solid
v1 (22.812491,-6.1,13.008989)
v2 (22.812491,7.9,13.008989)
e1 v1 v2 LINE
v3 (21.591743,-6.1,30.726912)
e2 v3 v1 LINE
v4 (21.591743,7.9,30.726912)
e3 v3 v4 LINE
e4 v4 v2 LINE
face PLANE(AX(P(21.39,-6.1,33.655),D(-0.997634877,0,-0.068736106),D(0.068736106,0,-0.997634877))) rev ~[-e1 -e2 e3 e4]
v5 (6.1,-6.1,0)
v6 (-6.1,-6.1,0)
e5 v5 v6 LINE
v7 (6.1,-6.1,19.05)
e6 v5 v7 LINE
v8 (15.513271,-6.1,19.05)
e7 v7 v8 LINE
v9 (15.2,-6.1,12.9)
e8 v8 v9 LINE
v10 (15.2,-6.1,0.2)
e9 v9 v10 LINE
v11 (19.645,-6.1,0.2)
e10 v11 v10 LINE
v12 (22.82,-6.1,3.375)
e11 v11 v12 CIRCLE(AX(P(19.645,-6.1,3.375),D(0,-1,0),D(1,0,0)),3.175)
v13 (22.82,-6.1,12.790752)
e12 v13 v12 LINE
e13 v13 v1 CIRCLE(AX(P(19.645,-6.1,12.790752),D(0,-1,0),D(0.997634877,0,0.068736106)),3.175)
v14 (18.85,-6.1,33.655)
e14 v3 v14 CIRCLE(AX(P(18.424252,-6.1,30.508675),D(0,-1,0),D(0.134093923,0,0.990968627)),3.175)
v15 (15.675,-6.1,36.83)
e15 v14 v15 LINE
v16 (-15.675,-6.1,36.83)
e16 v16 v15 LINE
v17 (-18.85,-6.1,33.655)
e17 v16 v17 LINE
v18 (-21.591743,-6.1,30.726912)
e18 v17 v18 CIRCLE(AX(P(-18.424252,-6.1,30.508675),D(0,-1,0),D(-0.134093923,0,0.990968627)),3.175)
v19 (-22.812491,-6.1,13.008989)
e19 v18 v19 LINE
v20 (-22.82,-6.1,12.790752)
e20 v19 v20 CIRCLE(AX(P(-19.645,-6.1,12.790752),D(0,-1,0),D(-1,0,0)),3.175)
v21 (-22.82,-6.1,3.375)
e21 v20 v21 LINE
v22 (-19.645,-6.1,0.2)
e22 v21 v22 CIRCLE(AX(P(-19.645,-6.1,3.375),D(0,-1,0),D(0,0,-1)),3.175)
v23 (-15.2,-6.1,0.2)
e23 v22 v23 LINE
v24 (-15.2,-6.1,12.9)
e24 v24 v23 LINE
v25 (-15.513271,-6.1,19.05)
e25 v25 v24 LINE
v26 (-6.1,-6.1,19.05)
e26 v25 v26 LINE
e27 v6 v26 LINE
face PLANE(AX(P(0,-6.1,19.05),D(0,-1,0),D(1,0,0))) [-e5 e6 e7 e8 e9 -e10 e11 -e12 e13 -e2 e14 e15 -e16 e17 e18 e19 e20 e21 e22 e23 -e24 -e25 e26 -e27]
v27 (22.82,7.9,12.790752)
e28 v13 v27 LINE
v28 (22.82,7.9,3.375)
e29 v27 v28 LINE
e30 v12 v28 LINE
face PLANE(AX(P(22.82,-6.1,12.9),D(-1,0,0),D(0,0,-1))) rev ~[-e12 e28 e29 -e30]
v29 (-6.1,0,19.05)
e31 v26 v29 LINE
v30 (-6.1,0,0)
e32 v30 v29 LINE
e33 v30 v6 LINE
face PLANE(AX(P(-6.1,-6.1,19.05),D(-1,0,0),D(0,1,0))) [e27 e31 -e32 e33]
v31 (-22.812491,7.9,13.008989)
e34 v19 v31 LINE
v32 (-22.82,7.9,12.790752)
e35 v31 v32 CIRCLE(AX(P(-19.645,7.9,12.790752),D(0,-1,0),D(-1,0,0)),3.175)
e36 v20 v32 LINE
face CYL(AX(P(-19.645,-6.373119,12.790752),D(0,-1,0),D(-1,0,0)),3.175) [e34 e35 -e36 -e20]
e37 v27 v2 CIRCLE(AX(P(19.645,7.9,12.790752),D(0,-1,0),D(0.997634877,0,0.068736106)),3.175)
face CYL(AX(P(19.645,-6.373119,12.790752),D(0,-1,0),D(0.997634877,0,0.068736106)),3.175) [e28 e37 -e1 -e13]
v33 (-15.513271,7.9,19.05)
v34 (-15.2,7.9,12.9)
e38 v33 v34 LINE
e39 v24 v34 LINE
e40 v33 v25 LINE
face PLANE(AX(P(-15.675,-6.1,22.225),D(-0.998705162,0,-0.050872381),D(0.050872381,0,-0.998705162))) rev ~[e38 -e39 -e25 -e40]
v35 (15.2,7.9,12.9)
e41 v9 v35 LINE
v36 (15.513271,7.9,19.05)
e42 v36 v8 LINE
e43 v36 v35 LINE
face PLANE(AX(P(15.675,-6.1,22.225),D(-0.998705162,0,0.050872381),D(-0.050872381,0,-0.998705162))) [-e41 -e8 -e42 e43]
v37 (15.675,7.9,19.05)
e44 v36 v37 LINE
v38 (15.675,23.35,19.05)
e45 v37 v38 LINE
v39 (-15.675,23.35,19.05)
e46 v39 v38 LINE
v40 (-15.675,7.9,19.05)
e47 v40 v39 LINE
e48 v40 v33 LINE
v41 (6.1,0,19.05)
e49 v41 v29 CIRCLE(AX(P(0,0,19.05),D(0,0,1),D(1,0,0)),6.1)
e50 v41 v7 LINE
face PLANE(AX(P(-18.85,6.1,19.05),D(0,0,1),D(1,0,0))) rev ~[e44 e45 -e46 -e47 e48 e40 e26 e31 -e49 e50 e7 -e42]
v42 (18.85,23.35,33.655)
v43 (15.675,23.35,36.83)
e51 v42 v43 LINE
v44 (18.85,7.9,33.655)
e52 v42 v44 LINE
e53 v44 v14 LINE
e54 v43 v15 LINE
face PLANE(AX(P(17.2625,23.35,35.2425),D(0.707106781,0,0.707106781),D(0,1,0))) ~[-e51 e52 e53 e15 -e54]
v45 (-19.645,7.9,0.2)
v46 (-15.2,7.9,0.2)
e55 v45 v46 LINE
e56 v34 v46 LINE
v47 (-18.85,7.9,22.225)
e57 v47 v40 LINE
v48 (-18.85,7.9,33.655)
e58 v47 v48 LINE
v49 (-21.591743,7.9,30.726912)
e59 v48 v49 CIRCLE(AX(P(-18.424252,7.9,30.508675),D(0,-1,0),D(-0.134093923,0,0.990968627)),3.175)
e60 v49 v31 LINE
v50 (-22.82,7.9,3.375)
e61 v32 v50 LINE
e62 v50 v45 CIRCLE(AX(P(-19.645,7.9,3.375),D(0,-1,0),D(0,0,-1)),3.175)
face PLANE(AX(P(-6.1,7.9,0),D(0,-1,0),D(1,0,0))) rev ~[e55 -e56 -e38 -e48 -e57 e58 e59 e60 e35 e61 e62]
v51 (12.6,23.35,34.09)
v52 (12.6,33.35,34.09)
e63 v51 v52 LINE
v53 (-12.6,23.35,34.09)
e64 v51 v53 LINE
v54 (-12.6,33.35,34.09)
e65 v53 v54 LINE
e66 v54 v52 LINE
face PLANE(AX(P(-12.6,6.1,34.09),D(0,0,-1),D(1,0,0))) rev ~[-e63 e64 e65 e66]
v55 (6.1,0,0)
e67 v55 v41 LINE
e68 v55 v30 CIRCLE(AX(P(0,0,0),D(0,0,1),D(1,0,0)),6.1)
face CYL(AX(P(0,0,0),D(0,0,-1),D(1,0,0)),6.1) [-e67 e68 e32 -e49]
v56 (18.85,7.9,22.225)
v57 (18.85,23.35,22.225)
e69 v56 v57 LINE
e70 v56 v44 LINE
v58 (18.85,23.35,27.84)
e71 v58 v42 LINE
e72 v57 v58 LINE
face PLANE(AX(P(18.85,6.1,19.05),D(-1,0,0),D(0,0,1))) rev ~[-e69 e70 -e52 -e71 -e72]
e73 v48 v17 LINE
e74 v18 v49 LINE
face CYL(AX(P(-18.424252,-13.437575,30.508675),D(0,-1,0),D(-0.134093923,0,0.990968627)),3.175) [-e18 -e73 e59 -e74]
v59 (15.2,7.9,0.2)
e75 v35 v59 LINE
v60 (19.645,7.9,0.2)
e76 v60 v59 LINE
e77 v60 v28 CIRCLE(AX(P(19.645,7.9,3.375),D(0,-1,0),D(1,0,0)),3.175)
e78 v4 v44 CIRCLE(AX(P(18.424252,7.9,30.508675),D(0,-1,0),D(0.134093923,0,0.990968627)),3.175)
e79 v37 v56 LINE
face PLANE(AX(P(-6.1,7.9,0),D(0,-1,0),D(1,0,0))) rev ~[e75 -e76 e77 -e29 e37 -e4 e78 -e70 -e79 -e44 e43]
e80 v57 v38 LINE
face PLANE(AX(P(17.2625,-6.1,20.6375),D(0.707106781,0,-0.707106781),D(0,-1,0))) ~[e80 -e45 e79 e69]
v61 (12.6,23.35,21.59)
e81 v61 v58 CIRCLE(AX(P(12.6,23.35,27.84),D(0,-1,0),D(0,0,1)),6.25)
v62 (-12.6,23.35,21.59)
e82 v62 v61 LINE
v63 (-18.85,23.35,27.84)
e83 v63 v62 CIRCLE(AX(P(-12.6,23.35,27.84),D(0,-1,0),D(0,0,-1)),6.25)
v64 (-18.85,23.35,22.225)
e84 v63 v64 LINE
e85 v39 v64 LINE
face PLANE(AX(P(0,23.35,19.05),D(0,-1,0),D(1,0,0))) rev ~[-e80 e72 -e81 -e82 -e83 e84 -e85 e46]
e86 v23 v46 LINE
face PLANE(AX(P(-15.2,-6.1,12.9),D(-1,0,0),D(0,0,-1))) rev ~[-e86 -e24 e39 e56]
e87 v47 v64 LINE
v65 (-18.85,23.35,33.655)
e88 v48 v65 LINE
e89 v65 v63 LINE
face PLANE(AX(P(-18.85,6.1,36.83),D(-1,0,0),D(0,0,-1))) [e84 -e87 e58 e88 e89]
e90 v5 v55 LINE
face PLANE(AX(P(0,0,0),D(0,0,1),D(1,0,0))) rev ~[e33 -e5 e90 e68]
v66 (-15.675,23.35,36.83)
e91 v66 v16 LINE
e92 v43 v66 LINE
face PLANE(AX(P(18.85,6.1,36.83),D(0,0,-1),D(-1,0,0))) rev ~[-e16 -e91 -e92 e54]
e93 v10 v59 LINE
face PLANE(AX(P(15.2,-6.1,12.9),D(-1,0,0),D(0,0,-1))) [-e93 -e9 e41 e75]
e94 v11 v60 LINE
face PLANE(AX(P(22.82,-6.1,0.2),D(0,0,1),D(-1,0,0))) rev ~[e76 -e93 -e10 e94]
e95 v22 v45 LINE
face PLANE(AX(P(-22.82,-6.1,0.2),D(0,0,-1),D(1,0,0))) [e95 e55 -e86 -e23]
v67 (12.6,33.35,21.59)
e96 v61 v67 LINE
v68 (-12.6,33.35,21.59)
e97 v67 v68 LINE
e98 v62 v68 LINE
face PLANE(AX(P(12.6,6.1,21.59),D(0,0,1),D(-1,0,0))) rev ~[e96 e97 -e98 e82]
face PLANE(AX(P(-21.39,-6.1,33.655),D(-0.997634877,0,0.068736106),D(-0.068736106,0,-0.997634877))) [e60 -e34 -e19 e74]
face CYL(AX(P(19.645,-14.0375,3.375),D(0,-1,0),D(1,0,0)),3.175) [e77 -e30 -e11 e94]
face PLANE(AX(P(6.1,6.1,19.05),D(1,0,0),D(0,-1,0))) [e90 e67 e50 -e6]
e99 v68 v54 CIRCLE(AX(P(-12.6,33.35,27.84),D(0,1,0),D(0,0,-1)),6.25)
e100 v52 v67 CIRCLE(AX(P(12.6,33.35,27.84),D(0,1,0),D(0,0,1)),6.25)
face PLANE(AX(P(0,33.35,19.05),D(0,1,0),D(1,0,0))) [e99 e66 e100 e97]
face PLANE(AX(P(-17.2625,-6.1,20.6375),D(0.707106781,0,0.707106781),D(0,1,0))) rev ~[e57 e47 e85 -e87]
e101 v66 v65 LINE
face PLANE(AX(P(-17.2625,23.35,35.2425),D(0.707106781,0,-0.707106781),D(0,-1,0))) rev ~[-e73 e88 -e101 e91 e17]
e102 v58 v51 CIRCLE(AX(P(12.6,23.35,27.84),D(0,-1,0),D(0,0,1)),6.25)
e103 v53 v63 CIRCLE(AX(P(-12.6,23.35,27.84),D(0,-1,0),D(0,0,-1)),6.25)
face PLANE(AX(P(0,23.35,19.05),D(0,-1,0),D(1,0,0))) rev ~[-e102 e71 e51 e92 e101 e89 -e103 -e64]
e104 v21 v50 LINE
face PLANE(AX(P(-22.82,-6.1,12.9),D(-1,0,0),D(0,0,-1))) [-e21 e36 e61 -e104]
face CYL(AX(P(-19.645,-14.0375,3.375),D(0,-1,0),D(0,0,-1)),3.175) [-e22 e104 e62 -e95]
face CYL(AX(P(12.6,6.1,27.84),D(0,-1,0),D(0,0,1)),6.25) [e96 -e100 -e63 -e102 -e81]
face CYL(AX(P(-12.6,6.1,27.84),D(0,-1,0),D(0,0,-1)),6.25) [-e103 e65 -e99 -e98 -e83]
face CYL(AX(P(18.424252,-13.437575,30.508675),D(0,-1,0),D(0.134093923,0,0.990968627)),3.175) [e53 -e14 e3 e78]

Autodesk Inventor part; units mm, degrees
ref_plane "YZ Plane" through (0, 0, 0) normal (1, 0, 0) x (0, 1, 0)
ref_plane "XZ Plane" through (0, 0, 0) normal (0, 1, 0) x (-1, 0, 0)
ref_plane "XY Plane" through (0, 0, 0) normal (0, 0, 1) x (1, 0, 0)
sketch "Sketch1" plane through (0, 0, 0) normal (0, 0, 1) x (1, 0, 0)
  circle A0 centre (0, 0) radius 6.1
  line L0 (-6.1, 0) -> (-6.1, -6.1)
  line L1 (-6.1, -6.1) -> (6.1, -6.1)
  line L2 (6.1, -6.1) -> (6.1, 0)
  dimension "d0" = 12.2
extrude "Extrusion1" add sketch "Sketch1" along normal blind 19.05
sketch "Sketch2" plane through (0, 0, 19.05) normal (0, 0, 1) x (1, 0, 0)
  arc A0 (6.1, 0) -> (-6.1, 0) centre (0, 0) ccw construction
  line L0 (-6.1, 0) -> (-6.1, -6.1) construction
  line L1 (6.1, -6.1) -> (6.1, 0) construction
  line L2 (-6.1, -6.1) -> (-6.1, 6.1)
  line L3 (-6.1, 6.1) -> (6.1, 6.1)
  line L4 (6.1, 6.1) -> (6.1, -6.1)
  line L5 (-6.1, -6.1) -> (6.1, -6.1)
extrude "Extrusion2" add sketch "Sketch2" along normal blind 17.78
sketch "Sketch3" plane through (0, 6.1, 19.05) normal (0, 1, 0) x (1, 0, 0)
  line L0 (0, 0) -> (-6.1, 0) construction
  line L1 (-12.6, -8.79) -> (12.6, -8.79) construction
  line L2 (-12.6, -15.04) -> (12.6, -15.04)
  line L3 (12.6, -2.54) -> (-12.6, -2.54)
  arc A0 (-12.6, -2.54) -> (-12.6, -15.04) centre (-12.6, -8.79) ccw
  arc A1 (12.6, -15.04) -> (12.6, -2.54) centre (12.6, -8.79) ccw
  point P0 (0, 19.05)
  point P1 (0, -8.79)
  point P2 (0, -2.54)
  dimension "d5" = 2.54
  dimension "d6" = 25.2
  dimension "d7" = 12.5
extrude "Extrusion3" add sketch "Sketch3" along normal blind 27.25
sketch "Sketch4" plane through (0, 6.1, 19.05) normal (0, -1, 0) x (1, 0, 0)
  arc A0 (12.6, 2.54) -> (12.6, 15.04) centre (12.6, 8.79) ccw construction
  line L0 (-18.85, 0) -> (18.85, 0)
  line L1 (18.85, 0) -> (18.85, 17.78)
  line L2 (18.85, 17.78) -> (-18.85, 17.78)
  line L3 (-18.85, 17.78) -> (-18.85, 0)
  arc A1 (-12.6, 15.04) -> (-12.6, 2.54) centre (-12.6, 8.79) ccw construction
  line L4 (-6.1, 17.78) -> (6.1, 17.78) construction
  point P0 (0, -19.05)
  point P1 (-18.85, 8.79)
  point P2 (18.85, 8.79)
  point P3 (0, 17.78)
  point P4 (0, 0)
extrude "Extrusion4" add sketch "Sketch4" against normal blind 17.25
sketch "Sketch5" plane through (0, 6.1, 19.05) normal (0, -1, 0) x (1, 0, 0)
  line L0 (-18.85, 0) -> (-6.1, 0) construction
  line L1 (18.85, 17.78) -> (-18.85, 17.78)
  line L2 (-18.85, 17.78) -> (-18.85, 0)
  line L3 (-18.85, 0) -> (18.85, 0)
  line L4 (18.85, 0) -> (18.85, 17.78)
  point P0 (0, -19.05)
extrude "Extrusion5" add sketch "Sketch5" along normal up to surface (12.2 mm away)
chamfer "Chamfer1" distance 3.175 angle 45 4 edges at (18.85, 8.625, 19.05) (18.85, 8.625, 36.83) (-18.85, 8.625, 19.05) (-18.85, 8.625, 36.83)
sketch "Sketch6" plane through (-6.1, -6.1, 0) normal (0, -1, 0) x (1, 0, 0)
  line L0 (0, 0) -> (12.2, 0) construction
  line L1 (24.95, 33.655) -> (24.95, 22.225) construction
  line L2 (-9.575, 36.83) -> (21.775, 36.83) construction
  line L3 (21.3, 12.9) -> (21.3, 0.2)
  line L4 (24.95, 27.84) -> (24.95, 22.225) construction
  line L5 (24.95, 22.225) -> (21.775, 22.225)
  line L6 (21.775, 22.225) -> (21.3, 12.9)
  line L7 (24.95, 22.225) -> (24.95, 33.655)
  line L8 (24.95, 33.655) -> (27.49, 33.655)
  line L9 (27.49, 33.655) -> (28.92, 12.9)
  line L10 (28.92, 12.9) -> (28.92, 0.2)
  line L11 (28.92, 0.2) -> (21.3, 0.2)
  line L12 (6.1, 0) -> (6.1, 36.83)
  line L13 (-12.75, 22.225) -> (-9.575, 19.05) construction
  line L14 (-12.75, 33.655) -> (-12.75, 22.225) construction
  line L15 (-9.1, 12.9) -> (-9.1, 0.2)
  line L16 (-12.75, 27.84) -> (-12.75, 22.225) construction
  line L17 (-12.75, 22.225) -> (-9.575, 22.225)
  line L18 (-9.575, 22.225) -> (-9.1, 12.9)
  line L19 (-12.75, 22.225) -> (-12.75, 33.655)
  line L20 (-12.75, 33.655) -> (-15.29, 33.655)
  line L21 (-15.29, 33.655) -> (-16.72, 12.9)
  line L22 (-16.72, 12.9) -> (-16.72, 0.2)
  line L23 (-16.72, 0.2) -> (-9.1, 0.2)
  point P0 (6.1, 0)
  dimension "d17" = 15.2
  dimension "d19" = 0.2
  dimension "d21" = 7.62
  dimension "d23" = 12.7
  dimension "d28" = 2.54
  dimension "d29" = 3.175
extrude "Extrusion6" add sketch "Sketch6" against normal blind 14
fillet "Fillet1" radius 3.175 6 edges at (21.39, 0.9, 33.655) (-21.39, 0.9, 33.655) (-22.82, 0.9, 0.2) (-22.82, 0.9, 12.9) (22.82, 0.9, 0.2) (22.82, 0.9, 12.9)
properties part number "SecondarySecure"
